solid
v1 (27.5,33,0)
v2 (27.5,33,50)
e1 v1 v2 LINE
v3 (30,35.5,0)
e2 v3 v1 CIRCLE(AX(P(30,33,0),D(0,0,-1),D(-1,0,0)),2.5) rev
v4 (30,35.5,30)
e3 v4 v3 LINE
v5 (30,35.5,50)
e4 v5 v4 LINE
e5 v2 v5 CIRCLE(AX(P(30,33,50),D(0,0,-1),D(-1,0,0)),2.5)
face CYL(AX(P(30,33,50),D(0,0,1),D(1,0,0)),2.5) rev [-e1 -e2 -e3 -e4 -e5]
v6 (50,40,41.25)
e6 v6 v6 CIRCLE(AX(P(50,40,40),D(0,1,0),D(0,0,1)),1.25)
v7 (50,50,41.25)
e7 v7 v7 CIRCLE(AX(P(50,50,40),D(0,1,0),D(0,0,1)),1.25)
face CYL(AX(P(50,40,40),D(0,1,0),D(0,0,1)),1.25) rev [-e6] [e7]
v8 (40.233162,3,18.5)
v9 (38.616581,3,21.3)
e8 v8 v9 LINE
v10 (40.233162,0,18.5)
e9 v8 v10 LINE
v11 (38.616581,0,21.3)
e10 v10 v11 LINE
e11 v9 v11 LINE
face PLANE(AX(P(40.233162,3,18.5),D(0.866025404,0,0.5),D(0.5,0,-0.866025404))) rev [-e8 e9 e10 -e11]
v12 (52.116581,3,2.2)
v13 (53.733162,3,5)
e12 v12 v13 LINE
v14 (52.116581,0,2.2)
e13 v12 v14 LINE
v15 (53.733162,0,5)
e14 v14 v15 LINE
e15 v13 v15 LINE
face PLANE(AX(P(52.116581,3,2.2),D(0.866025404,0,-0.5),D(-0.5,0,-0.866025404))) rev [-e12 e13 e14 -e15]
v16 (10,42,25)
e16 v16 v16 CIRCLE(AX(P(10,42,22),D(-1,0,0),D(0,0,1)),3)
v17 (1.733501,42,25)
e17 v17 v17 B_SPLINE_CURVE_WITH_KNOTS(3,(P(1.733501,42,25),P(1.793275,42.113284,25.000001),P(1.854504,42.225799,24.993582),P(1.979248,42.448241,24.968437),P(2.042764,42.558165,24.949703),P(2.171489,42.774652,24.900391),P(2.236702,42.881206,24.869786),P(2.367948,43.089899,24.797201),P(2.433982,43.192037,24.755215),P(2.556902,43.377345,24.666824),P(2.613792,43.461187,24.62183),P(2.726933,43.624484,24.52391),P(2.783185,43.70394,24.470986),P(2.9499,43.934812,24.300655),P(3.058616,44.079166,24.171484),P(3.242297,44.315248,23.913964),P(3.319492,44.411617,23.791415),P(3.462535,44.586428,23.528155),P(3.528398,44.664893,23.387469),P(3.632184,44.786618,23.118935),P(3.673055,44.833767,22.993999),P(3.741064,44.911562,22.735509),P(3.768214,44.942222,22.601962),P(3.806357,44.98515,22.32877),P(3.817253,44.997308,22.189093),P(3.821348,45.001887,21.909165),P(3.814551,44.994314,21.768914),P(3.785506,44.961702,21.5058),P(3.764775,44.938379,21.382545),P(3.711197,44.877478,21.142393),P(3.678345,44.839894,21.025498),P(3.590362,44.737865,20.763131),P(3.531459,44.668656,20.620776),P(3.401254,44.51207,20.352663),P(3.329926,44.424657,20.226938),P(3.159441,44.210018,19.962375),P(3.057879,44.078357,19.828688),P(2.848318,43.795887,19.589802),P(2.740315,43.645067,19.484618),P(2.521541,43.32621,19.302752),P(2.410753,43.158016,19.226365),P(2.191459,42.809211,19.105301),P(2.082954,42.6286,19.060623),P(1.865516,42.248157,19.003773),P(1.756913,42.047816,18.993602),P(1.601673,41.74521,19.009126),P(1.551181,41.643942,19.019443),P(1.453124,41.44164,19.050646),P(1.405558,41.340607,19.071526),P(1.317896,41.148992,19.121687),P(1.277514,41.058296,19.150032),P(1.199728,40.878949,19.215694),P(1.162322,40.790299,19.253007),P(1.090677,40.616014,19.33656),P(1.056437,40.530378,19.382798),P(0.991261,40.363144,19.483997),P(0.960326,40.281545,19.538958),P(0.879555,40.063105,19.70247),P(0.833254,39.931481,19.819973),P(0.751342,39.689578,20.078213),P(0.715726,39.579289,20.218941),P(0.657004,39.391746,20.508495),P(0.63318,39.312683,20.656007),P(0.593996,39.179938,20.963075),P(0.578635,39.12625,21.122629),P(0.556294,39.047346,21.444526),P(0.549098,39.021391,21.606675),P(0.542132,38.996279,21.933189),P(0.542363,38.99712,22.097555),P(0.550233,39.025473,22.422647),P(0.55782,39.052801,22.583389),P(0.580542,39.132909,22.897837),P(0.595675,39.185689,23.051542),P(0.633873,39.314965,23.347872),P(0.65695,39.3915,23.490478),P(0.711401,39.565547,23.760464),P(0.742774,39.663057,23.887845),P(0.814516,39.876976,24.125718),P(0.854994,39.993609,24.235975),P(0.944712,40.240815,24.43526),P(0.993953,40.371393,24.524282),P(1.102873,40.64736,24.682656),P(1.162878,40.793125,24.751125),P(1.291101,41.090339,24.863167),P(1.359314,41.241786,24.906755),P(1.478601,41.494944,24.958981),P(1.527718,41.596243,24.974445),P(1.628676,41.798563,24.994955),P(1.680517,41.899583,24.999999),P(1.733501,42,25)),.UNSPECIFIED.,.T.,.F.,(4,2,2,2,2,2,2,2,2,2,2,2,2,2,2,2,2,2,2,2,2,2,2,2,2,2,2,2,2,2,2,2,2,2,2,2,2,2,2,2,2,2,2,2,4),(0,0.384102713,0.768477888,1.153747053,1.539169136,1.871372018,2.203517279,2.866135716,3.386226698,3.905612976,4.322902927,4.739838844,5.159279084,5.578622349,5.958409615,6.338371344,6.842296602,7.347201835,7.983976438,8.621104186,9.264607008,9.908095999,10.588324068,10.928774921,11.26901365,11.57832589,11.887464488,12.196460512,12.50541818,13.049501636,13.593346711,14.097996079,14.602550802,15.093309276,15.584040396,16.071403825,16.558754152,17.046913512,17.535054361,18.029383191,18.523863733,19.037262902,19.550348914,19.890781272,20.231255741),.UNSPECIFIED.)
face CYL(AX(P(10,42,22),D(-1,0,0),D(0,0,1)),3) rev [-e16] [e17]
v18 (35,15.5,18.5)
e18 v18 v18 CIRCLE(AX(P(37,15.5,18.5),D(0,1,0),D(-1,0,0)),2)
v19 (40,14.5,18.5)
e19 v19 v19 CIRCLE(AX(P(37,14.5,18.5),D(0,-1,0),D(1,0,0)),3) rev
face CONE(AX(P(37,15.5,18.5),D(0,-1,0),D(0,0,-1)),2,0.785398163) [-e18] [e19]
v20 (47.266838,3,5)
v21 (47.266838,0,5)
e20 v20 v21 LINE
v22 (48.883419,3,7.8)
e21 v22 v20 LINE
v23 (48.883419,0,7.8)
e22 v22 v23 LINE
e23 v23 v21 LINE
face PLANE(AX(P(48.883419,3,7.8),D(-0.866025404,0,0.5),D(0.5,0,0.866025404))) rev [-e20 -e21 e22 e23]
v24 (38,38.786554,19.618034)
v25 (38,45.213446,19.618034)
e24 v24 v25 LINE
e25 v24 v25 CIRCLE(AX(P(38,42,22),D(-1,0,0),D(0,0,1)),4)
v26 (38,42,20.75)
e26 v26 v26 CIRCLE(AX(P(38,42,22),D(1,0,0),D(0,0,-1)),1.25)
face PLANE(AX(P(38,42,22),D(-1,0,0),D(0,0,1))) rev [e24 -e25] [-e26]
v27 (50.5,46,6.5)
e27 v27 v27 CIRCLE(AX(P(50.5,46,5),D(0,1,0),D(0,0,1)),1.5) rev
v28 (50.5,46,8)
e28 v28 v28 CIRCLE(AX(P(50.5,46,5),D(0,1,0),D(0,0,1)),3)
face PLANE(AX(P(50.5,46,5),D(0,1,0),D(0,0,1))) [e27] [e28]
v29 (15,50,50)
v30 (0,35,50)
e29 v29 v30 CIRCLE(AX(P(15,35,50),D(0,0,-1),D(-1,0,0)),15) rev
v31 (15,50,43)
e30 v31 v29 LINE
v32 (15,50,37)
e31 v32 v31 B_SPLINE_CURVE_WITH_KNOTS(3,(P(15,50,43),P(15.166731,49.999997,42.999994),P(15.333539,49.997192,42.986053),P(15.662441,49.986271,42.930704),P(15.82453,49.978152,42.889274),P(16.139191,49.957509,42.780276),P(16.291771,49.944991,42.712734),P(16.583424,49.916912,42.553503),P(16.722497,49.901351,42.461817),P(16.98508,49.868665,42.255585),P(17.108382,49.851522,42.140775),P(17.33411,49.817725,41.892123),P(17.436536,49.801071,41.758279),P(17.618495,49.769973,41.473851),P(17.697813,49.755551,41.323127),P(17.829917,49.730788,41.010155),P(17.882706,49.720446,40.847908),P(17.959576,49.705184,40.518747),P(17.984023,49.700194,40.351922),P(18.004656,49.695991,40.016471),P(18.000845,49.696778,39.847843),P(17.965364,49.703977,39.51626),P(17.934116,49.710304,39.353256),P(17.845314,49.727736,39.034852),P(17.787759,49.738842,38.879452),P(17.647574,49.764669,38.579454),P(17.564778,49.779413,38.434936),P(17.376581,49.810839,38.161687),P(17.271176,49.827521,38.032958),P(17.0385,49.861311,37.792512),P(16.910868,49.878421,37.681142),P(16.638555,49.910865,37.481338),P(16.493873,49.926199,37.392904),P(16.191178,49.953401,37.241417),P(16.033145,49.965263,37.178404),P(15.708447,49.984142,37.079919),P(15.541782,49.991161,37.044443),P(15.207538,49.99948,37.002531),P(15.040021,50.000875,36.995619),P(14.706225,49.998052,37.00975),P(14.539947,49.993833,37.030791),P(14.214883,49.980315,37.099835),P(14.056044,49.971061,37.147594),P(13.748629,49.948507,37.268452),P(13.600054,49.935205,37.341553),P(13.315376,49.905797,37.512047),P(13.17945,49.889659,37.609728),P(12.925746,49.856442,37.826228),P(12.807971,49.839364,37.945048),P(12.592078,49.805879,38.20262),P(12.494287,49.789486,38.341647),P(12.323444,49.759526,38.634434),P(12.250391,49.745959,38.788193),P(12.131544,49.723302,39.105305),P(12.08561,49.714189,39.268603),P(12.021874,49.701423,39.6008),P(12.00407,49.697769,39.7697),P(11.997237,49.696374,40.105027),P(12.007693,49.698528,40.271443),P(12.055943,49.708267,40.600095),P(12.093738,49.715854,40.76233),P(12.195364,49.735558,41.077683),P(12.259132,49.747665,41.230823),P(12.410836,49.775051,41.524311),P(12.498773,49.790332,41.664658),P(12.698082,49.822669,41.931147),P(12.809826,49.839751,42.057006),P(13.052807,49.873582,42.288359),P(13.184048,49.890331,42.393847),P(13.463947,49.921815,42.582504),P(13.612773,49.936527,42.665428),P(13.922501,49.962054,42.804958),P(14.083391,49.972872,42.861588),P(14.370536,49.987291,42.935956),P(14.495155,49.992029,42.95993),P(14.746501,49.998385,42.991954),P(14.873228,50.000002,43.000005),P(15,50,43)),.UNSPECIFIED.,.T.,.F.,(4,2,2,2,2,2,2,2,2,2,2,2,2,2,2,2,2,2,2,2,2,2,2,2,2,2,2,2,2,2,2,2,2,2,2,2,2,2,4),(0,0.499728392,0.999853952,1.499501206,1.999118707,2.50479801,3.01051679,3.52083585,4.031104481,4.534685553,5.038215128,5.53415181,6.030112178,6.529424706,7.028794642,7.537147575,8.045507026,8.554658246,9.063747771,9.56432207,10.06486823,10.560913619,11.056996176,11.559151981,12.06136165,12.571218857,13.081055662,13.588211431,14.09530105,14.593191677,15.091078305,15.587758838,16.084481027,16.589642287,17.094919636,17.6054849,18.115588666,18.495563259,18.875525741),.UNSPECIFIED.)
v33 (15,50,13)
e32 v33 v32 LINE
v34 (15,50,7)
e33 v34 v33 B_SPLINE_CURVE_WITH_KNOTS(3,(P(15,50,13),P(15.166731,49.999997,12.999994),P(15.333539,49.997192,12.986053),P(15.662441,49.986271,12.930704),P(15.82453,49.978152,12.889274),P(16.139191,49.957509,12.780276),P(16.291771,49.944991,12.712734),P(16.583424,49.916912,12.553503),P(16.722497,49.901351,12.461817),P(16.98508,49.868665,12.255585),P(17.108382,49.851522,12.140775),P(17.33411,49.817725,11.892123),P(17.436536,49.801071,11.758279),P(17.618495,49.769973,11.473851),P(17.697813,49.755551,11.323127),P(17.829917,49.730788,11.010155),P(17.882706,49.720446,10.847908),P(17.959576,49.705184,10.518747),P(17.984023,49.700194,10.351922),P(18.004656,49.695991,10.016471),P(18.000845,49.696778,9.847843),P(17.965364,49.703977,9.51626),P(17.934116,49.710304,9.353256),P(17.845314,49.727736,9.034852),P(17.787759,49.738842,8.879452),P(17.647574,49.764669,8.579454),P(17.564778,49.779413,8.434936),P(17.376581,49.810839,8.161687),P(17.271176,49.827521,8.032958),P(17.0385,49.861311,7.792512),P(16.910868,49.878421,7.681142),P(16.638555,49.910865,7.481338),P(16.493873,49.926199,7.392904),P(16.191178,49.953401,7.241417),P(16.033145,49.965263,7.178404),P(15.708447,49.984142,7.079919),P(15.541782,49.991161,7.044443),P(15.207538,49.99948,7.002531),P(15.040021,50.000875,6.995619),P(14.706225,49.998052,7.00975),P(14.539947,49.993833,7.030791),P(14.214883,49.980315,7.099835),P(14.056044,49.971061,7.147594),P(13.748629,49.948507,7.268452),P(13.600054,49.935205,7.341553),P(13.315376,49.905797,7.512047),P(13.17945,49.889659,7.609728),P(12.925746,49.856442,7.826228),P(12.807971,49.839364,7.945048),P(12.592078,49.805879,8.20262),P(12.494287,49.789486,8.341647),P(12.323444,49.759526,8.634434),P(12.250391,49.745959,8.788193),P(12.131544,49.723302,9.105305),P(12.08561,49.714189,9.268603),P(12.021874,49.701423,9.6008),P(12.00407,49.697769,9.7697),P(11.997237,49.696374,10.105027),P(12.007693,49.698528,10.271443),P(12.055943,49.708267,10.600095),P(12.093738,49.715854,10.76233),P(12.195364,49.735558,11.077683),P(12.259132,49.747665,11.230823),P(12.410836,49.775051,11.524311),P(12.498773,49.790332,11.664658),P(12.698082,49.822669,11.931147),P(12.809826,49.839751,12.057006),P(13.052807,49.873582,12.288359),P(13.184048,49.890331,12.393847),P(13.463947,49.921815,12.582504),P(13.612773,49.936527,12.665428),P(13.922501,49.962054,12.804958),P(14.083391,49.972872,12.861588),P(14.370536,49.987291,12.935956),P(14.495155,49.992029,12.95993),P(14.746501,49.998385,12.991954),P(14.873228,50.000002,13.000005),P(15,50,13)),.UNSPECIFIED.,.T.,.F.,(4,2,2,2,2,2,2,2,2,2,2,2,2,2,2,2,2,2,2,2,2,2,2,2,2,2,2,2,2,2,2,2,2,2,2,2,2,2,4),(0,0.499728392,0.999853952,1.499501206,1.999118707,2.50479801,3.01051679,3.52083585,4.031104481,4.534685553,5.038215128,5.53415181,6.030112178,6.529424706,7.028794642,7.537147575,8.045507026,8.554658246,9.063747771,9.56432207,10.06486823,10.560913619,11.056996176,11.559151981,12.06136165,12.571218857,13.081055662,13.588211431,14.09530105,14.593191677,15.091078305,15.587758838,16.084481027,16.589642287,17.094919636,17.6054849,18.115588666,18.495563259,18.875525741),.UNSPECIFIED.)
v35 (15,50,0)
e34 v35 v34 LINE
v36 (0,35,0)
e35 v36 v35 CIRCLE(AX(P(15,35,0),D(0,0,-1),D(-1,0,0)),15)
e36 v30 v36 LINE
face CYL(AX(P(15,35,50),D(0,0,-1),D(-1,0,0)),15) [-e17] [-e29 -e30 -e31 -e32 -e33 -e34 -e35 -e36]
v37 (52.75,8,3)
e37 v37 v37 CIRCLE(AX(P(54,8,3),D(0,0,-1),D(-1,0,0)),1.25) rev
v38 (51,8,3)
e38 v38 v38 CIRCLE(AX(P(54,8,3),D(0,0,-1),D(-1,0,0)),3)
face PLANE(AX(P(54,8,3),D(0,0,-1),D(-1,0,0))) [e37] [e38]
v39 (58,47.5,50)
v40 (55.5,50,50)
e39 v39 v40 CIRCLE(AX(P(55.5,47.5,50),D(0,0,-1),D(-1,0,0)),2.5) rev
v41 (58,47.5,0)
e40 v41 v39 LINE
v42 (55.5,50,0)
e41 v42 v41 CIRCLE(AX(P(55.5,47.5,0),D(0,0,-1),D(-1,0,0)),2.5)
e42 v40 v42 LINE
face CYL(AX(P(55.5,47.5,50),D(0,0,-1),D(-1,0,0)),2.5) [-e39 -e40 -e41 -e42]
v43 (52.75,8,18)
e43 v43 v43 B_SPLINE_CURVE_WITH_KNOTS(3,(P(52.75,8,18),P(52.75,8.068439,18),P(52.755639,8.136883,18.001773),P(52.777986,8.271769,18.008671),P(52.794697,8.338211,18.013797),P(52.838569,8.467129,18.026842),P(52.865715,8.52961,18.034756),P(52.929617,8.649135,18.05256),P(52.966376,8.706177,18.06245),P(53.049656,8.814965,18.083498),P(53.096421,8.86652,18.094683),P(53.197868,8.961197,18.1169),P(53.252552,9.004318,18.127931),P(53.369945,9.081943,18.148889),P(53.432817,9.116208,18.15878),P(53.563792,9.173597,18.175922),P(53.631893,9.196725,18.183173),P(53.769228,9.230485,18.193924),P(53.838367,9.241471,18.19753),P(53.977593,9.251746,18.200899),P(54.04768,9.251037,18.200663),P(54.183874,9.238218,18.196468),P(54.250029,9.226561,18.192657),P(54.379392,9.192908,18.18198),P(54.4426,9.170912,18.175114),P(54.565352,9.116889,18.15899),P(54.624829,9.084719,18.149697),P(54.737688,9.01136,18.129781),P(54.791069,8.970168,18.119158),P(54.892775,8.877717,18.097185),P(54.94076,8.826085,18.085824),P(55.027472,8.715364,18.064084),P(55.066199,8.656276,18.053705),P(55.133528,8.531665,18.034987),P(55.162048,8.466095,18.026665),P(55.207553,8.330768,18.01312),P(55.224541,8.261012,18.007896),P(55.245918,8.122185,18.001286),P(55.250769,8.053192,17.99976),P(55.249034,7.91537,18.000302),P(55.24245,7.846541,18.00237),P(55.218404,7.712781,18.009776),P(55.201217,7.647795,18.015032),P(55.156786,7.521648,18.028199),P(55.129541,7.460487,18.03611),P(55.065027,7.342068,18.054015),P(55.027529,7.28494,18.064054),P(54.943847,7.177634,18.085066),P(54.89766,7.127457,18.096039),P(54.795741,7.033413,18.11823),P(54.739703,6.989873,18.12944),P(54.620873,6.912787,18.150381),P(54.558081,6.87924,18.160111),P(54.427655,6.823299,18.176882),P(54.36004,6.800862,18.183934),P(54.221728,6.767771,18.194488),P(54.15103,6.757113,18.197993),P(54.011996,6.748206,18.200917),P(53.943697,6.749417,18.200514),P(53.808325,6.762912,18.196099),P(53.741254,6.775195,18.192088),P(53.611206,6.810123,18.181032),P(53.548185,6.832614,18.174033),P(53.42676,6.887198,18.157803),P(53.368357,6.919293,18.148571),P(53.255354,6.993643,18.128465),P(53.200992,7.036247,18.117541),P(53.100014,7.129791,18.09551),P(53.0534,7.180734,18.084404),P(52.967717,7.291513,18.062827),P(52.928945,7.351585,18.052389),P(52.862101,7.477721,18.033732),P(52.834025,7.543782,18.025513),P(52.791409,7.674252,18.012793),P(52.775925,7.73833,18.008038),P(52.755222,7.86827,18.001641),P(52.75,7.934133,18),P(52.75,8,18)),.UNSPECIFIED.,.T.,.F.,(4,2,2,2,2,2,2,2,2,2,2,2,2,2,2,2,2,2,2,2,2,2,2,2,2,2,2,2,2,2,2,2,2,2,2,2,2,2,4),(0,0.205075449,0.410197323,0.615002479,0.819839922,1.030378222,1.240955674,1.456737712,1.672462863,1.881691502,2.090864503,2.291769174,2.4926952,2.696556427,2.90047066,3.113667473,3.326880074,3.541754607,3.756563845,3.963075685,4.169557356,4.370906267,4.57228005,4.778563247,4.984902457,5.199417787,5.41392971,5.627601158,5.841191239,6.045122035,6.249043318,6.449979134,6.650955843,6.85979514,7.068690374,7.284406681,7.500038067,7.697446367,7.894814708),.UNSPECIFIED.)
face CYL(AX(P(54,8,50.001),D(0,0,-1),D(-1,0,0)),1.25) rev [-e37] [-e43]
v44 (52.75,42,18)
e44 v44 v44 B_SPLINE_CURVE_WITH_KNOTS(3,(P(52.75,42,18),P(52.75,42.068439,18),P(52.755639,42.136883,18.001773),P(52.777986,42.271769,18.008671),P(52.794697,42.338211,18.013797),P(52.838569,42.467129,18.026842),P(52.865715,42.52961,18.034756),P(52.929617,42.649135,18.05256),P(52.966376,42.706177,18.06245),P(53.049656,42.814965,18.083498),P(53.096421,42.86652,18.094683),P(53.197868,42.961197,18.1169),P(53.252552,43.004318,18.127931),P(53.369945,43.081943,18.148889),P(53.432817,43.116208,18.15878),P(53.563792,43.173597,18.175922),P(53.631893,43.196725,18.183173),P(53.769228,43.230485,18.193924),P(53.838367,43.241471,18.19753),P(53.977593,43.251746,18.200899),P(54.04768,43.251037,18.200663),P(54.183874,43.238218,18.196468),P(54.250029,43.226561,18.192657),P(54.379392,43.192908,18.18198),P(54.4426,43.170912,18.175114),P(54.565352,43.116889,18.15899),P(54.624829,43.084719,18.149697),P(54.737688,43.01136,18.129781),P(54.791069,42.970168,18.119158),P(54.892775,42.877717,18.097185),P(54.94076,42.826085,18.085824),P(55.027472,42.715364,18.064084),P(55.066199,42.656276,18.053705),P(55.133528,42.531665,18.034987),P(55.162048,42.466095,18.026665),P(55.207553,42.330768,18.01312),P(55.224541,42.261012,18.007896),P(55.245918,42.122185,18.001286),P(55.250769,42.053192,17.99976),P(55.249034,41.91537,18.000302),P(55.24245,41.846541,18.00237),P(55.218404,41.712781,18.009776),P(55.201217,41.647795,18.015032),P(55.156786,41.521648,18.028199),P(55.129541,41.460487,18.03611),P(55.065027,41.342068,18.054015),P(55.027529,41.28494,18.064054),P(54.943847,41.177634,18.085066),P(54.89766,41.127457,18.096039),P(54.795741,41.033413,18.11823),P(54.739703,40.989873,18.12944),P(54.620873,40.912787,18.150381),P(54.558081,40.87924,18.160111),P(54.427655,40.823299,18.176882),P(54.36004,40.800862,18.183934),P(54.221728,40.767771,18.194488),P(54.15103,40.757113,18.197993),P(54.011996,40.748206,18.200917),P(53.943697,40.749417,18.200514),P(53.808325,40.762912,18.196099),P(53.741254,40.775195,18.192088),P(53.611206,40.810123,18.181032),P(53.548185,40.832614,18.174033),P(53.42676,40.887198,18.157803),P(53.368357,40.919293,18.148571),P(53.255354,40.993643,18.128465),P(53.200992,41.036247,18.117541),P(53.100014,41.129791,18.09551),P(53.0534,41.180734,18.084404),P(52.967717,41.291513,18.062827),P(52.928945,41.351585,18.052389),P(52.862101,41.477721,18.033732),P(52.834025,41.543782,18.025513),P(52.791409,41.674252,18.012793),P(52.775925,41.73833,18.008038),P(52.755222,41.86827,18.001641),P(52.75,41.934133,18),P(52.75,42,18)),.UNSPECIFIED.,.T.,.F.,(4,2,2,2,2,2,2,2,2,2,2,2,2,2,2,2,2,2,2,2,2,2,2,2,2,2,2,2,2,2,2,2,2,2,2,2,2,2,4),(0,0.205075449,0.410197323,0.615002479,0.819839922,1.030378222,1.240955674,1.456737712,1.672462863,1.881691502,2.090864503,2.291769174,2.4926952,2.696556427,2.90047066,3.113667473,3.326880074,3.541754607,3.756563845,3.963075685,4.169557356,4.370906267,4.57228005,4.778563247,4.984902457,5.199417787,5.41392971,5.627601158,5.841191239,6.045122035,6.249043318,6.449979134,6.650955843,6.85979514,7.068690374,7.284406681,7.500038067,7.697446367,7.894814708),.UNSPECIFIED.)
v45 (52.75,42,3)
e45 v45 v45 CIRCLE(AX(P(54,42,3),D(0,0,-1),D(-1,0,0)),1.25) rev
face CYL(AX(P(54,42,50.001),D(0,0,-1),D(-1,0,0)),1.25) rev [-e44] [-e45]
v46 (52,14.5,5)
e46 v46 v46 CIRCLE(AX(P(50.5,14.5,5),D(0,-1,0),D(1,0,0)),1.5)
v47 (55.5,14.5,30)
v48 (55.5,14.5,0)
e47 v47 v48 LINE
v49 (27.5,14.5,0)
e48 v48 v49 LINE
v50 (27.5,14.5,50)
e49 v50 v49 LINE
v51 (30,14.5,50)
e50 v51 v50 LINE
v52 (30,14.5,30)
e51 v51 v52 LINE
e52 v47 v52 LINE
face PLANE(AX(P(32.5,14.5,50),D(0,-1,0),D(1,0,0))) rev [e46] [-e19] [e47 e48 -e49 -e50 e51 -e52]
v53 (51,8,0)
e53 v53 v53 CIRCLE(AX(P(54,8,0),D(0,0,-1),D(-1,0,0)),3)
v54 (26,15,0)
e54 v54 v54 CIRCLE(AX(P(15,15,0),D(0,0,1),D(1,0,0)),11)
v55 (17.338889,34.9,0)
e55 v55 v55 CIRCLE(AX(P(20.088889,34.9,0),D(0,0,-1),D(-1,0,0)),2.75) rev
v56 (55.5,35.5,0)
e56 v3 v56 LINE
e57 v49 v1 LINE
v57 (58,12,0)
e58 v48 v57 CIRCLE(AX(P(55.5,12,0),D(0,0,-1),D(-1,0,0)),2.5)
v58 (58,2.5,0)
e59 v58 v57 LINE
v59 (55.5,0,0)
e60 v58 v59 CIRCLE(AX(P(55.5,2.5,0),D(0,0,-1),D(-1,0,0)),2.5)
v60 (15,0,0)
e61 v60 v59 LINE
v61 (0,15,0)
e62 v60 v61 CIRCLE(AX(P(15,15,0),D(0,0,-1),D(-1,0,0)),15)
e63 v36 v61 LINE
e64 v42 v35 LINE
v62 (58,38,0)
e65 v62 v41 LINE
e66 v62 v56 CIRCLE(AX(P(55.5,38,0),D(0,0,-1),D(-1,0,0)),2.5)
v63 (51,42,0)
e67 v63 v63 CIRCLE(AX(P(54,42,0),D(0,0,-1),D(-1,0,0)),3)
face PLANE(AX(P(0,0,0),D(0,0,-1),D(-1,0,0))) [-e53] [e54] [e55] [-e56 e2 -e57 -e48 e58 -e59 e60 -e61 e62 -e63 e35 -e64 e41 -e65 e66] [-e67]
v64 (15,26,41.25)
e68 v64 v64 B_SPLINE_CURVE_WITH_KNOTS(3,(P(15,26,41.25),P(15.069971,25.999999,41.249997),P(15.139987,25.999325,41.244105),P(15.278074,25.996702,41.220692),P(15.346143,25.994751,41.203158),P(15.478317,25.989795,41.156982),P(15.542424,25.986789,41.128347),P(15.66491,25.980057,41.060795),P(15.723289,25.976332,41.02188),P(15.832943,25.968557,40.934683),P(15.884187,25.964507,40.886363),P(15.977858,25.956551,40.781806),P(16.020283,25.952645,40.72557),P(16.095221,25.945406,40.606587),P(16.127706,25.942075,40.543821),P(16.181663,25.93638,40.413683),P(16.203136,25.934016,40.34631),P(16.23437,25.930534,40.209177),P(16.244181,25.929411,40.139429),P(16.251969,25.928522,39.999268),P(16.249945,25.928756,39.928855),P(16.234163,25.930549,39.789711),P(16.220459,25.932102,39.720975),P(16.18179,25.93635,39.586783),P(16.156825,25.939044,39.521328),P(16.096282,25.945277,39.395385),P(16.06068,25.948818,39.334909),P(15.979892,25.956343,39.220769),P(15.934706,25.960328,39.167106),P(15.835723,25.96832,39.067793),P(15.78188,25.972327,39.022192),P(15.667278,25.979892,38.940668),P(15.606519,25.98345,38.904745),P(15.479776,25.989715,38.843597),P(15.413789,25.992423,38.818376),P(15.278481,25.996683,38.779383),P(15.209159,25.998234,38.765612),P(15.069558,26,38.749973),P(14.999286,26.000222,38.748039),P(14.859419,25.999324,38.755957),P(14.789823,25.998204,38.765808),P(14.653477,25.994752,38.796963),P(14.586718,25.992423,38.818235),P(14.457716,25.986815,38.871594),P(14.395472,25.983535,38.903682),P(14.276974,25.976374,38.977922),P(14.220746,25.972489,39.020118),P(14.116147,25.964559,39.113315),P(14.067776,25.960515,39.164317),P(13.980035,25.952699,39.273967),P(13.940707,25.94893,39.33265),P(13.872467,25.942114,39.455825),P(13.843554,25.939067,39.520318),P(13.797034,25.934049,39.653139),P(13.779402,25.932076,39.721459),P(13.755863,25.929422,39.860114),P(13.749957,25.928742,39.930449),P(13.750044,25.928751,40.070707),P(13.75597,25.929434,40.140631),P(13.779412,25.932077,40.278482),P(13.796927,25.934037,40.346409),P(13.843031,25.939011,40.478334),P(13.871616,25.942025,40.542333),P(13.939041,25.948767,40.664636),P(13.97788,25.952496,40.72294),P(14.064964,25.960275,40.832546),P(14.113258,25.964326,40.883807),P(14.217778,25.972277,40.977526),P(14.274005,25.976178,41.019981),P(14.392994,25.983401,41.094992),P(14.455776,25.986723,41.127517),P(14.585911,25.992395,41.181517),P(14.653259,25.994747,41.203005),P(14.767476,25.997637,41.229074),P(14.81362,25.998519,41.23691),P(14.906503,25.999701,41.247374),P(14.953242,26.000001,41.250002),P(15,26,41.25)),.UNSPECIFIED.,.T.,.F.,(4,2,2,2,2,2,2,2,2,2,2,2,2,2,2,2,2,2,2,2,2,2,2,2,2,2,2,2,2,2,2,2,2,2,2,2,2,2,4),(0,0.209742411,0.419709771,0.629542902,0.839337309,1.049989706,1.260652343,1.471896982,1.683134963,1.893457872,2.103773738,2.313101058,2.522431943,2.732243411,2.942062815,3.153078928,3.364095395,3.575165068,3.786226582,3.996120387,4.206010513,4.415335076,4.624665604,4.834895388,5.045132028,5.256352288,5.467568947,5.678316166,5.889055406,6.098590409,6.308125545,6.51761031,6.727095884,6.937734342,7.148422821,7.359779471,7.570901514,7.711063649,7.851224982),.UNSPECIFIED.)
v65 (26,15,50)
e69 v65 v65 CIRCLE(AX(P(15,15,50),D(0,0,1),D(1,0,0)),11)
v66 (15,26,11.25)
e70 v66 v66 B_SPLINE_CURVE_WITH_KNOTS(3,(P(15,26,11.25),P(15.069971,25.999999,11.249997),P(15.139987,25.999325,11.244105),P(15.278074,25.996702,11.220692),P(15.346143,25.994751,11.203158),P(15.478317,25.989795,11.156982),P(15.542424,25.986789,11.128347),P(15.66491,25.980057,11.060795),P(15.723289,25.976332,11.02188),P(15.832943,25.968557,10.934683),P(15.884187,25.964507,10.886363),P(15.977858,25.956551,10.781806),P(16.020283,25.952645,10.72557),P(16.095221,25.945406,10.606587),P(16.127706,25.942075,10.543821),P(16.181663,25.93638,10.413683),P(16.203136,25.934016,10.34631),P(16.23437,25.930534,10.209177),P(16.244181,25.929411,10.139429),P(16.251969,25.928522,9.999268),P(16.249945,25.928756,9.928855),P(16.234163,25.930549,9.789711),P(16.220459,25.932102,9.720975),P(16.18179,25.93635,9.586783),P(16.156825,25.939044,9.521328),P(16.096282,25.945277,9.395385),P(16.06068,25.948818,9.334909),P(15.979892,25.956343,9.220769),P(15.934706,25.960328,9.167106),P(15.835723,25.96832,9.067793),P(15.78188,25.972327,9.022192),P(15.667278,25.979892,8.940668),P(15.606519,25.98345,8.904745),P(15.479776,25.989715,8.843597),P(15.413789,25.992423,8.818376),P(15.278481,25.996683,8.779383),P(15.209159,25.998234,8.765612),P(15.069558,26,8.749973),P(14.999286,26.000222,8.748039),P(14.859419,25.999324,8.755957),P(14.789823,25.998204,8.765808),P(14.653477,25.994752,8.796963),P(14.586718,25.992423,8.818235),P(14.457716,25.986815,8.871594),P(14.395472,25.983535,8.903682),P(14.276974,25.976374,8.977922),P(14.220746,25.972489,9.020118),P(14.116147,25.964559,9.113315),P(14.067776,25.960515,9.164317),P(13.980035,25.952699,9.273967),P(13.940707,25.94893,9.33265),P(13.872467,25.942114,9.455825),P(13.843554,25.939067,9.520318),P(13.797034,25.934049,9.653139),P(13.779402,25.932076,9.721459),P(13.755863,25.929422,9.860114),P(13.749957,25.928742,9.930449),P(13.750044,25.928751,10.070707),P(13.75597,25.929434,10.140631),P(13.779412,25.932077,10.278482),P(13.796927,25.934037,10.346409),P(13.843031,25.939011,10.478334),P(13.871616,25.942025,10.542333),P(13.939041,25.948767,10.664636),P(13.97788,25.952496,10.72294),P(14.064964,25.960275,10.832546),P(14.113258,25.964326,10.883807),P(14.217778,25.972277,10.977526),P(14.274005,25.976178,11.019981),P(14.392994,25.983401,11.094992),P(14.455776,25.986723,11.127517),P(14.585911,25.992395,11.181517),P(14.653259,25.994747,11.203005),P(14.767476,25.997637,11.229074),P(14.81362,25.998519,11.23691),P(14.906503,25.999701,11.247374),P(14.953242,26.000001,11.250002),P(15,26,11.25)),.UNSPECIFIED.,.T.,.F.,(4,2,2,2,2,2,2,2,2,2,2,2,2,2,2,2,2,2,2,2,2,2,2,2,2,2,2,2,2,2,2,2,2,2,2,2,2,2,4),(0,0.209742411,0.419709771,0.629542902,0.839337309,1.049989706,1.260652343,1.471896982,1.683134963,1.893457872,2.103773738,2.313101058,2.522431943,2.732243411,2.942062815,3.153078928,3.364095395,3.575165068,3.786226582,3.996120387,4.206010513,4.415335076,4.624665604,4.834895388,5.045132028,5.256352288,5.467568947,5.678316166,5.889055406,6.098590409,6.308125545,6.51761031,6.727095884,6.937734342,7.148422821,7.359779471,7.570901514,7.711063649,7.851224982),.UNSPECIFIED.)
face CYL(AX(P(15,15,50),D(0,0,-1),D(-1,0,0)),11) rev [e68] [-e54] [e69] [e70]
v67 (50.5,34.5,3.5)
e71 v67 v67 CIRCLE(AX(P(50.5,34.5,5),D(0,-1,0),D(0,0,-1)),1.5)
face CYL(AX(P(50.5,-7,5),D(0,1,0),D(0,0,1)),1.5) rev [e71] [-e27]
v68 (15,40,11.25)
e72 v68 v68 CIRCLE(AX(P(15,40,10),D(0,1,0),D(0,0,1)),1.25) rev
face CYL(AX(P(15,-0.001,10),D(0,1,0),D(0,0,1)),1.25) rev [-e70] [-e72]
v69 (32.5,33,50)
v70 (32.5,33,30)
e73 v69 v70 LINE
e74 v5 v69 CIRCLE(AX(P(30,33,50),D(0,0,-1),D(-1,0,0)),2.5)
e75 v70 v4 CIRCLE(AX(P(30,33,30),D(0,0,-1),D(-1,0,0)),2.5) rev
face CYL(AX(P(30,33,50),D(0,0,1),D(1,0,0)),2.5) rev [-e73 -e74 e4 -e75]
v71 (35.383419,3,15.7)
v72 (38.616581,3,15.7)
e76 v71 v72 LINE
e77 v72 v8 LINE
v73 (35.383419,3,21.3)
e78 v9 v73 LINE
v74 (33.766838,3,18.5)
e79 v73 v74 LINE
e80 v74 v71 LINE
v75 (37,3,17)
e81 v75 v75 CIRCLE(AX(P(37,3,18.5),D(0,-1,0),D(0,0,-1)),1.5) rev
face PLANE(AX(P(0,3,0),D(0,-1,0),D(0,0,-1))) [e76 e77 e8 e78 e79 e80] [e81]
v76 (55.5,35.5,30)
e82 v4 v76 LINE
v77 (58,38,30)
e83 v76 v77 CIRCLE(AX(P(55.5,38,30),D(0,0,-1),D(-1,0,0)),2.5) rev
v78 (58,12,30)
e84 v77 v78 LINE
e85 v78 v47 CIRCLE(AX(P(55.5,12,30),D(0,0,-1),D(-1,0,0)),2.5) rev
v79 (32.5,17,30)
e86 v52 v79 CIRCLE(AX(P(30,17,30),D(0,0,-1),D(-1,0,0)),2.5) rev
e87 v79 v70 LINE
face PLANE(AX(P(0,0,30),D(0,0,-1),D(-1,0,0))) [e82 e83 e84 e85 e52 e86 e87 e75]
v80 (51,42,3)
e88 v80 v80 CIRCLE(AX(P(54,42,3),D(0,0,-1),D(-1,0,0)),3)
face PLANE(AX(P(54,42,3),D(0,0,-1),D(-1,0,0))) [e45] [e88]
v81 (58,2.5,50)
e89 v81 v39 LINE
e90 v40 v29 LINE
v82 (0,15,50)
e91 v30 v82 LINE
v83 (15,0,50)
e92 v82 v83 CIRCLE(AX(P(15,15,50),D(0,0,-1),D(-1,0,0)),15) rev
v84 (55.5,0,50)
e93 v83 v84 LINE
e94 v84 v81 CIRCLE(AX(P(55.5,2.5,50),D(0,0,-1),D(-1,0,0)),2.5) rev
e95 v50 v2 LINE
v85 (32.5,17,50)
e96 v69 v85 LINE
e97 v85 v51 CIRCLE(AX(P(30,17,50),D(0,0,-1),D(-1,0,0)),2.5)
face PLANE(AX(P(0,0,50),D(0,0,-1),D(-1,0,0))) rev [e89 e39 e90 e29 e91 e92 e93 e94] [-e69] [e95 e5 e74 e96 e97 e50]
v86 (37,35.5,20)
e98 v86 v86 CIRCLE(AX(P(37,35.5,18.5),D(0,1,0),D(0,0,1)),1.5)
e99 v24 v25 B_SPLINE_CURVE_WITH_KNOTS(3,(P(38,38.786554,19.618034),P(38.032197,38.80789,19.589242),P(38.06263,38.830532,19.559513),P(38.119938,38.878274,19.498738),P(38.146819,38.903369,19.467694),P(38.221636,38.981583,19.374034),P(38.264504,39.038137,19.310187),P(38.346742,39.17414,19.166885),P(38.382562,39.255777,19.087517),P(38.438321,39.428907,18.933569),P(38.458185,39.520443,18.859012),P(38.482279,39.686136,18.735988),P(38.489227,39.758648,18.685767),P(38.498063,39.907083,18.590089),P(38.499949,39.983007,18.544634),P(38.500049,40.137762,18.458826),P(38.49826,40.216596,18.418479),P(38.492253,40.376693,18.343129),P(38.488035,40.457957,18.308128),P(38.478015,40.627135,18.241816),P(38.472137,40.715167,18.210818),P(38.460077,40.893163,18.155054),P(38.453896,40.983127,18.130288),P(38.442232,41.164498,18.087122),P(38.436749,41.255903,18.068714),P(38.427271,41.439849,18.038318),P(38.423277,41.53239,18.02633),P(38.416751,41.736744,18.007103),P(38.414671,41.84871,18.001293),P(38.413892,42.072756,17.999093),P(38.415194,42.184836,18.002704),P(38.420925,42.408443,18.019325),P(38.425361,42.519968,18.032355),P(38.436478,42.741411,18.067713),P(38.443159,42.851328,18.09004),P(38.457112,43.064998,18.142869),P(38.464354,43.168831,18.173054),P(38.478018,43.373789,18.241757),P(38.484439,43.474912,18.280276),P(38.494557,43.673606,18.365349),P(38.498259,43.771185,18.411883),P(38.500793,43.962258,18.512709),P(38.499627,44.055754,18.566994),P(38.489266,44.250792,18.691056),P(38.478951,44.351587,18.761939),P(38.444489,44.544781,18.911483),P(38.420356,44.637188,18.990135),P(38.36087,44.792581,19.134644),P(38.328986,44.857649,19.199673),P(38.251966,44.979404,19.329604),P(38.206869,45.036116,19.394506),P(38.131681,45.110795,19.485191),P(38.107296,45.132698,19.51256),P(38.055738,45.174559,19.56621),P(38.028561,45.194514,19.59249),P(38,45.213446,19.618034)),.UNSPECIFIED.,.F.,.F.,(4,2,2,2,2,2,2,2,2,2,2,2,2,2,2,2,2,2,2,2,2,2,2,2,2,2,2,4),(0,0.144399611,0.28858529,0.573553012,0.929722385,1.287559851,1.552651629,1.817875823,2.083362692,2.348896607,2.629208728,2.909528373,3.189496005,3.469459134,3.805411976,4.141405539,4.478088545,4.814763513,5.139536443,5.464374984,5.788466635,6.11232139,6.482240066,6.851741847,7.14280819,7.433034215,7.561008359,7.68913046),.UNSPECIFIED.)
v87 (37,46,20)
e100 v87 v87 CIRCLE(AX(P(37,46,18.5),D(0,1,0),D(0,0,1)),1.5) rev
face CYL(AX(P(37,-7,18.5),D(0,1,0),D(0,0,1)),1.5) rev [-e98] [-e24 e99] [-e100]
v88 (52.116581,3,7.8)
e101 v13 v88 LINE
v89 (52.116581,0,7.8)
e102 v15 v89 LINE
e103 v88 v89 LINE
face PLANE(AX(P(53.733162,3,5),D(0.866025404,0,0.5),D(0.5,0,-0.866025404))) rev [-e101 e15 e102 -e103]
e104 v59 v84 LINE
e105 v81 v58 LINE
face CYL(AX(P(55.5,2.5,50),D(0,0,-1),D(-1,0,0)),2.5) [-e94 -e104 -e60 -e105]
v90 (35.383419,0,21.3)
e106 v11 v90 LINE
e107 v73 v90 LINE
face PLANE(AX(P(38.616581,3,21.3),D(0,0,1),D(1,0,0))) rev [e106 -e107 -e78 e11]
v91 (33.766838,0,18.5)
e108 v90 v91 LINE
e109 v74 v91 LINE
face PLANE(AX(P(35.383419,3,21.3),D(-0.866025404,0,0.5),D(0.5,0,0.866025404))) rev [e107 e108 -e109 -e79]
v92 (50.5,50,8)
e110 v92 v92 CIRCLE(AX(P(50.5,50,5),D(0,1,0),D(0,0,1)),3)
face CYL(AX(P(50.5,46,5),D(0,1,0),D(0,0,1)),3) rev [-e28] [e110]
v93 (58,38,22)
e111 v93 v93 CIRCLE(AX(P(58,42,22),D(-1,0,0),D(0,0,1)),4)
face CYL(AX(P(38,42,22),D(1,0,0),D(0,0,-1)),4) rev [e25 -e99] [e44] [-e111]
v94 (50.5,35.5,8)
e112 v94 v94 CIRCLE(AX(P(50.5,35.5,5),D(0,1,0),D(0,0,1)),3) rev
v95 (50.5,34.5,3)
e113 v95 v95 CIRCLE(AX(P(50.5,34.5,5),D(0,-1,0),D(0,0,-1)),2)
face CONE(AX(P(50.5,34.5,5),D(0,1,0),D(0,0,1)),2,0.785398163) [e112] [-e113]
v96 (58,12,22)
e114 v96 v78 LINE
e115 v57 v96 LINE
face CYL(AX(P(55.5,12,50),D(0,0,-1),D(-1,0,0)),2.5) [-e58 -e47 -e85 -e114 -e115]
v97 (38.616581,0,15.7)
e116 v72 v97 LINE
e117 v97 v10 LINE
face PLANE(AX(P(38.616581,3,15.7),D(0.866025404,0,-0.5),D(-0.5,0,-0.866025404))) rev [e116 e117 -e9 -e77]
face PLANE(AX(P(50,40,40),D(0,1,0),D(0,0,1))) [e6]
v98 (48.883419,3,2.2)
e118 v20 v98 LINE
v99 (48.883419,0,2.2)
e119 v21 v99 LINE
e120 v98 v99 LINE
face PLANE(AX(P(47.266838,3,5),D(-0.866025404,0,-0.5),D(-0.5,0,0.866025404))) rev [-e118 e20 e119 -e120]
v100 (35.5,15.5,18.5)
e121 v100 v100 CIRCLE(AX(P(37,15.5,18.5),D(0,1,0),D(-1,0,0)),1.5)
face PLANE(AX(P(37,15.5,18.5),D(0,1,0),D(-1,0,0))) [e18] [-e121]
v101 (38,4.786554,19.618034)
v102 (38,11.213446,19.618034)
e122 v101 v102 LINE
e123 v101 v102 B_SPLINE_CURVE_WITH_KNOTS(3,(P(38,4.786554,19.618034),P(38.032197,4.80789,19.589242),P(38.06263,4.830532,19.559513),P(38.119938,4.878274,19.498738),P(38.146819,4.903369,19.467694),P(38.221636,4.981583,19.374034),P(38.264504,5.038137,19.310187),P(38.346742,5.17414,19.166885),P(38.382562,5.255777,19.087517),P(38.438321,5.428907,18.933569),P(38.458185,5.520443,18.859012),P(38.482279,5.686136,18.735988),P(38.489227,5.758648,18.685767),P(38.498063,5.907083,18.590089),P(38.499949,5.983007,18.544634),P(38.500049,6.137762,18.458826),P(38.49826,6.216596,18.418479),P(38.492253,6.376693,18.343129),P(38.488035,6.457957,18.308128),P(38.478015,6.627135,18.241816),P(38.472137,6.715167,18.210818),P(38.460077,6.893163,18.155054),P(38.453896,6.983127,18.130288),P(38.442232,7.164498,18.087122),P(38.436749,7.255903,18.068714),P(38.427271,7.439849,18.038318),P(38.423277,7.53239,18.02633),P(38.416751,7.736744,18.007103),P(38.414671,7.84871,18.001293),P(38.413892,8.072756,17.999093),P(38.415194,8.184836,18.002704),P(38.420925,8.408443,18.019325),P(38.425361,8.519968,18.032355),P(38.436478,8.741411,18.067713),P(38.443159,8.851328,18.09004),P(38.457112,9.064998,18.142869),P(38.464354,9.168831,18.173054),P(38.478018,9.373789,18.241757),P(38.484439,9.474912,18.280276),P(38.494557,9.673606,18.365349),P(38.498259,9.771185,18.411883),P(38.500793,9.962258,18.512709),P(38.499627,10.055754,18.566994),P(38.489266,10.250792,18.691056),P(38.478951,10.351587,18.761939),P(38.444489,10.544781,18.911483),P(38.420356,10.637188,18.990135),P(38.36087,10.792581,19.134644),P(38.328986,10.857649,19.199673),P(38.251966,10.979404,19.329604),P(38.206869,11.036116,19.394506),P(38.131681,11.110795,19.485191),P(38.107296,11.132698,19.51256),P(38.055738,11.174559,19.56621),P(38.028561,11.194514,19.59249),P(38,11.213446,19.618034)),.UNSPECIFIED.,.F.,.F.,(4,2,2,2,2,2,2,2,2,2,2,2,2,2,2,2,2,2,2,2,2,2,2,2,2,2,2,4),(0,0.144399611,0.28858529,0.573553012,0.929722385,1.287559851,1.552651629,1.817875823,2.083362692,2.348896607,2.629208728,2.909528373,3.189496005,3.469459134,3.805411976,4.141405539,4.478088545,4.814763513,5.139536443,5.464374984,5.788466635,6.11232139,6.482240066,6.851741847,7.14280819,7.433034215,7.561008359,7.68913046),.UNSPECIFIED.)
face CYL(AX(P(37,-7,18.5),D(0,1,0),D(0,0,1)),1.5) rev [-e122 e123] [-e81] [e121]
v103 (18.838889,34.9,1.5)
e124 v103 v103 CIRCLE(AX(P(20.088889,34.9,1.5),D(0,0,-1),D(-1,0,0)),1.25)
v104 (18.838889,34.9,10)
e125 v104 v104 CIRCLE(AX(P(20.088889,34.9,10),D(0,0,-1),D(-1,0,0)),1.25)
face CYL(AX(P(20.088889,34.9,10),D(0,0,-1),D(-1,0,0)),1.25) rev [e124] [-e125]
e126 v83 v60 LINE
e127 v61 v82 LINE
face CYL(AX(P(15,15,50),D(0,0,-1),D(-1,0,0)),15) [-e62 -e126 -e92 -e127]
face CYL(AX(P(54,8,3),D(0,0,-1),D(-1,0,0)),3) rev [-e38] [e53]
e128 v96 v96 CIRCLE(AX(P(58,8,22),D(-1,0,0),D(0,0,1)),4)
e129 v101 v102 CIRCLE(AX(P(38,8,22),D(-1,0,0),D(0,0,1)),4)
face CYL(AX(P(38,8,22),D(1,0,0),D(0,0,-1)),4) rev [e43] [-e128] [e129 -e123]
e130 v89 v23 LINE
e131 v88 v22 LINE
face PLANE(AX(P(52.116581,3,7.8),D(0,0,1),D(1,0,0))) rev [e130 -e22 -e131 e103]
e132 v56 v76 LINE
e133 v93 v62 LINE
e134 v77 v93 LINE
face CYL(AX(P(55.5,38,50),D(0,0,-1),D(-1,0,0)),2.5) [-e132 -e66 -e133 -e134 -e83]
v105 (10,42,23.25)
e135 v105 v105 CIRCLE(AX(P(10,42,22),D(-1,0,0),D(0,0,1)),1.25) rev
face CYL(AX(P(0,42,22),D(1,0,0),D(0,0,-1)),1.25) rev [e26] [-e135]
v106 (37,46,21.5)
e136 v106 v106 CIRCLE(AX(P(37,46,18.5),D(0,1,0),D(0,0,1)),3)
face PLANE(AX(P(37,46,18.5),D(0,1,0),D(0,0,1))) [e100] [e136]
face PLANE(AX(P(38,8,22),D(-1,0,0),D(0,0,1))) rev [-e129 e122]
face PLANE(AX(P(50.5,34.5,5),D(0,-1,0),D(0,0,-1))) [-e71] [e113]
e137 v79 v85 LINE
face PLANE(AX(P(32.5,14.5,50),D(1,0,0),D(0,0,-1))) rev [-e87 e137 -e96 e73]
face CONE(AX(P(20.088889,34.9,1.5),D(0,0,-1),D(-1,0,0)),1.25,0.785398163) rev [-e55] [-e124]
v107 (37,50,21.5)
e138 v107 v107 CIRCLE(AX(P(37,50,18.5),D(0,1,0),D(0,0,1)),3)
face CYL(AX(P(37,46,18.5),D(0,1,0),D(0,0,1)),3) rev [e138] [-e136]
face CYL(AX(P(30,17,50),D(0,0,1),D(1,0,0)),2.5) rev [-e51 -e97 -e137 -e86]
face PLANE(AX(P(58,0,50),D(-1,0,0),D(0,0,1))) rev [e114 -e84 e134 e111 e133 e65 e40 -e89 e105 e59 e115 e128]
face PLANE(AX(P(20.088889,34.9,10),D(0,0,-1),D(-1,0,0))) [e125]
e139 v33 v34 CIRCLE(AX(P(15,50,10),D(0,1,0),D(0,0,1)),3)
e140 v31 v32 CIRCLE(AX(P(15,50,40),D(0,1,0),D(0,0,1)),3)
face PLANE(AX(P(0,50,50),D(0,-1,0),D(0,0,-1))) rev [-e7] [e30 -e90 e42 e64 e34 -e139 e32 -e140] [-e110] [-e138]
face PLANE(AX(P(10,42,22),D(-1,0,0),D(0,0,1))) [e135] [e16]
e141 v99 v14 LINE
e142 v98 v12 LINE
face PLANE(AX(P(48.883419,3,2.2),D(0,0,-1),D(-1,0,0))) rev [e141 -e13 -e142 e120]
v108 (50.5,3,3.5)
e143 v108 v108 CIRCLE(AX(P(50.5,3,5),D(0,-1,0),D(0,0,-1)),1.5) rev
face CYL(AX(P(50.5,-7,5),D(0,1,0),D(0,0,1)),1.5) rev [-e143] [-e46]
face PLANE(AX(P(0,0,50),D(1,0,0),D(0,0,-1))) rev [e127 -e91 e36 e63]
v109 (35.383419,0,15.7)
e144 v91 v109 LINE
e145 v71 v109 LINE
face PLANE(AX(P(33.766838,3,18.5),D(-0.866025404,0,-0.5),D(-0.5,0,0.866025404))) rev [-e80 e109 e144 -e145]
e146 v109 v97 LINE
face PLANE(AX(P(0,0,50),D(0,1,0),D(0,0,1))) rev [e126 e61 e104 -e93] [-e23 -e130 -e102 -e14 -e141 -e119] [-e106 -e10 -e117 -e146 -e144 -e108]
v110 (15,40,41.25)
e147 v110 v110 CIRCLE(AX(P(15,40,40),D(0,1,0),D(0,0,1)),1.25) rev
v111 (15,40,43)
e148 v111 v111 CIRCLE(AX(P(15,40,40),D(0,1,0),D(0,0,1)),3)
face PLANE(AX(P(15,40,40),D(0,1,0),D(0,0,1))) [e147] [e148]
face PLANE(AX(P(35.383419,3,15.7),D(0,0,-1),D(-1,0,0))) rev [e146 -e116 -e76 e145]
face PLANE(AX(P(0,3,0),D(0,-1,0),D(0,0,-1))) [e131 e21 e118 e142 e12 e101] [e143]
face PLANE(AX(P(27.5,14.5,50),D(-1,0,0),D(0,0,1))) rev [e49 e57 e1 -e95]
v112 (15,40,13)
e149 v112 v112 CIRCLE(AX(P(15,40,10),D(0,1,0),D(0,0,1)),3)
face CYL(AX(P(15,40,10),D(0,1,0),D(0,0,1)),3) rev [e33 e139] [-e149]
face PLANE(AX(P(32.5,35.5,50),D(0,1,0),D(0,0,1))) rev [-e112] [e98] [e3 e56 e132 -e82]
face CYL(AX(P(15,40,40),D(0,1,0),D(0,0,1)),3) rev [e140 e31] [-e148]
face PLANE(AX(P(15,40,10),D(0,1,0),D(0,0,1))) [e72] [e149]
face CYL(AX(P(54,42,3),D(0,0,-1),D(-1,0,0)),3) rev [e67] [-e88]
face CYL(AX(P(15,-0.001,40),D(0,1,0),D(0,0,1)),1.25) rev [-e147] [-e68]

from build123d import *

# Parameters (mm, degrees)
SKETCH1_W                = 58
SKETCH1_H                = 50
SKETCH1_R                = 11
BOSS_EXTRUDE1_DEPTH      = 50
SKETCH2_R                = 4
CUT_EXTRUDE1_DEPTH       = 20
SKETCH3_W                = 5
SKETCH3_H                = 21
CUT_EXTRUDE2_DEPTH       = 92.454906921
SKETCH14_W               = 25.5
SKETCH14_H               = 21
CUT_EXTRUDE9_DEPTH       = 30
SKETCH16_R               = 1.5
CUT_EXTRUDE10_DEPTH      = 57
CUT_EXTRUDE11_DEPTH      = 3
FILLET3_R                = 15
CUT_EXTRUDE12_REACH      = 93.455
SKETCH18_R               = 1.25
CUT_EXTRUDE13_REACH      = 93.455
CUT_EXTRUDE13_END_RADIUS = 11
SKETCH19_R               = 1.25
SKETCH20_R               = 3
CUT_EXTRUDE14_DEPTH      = 10
SKETCH21_R               = 3
CUT_EXTRUDE15_DEPTH      = 3
FILLET4_R                = 2.5
SKETCH22_R               = 1.25
CUT_EXTRUDE16_DEPTH      = 81.274529133
SKETCH23_R               = 3
CUT_EXTRUDE17_DEPTH      = 10
SKETCH24_R               = 3
CUT_EXTRUDE18_DEPTH      = 4
SKETCH25_R               = 1.25
CUT_EXTRUDE19_DEPTH      = 10
SKETCH26_R               = 3
SKETCH26_R_2             = 1.5
BOSS_EXTRUDE2_DEPTH      = 1
BOSS_EXTRUDE3_START      = 1
SKETCH27_R               = 3
SKETCH27_R_2             = 1.5
BOSS_EXTRUDE3_DEPTH      = 1
CHAMFER1_SIZE            = 1
SKETCH28_R               = 1.25
CUT_EXTRUDE20_DEPTH      = 10
CHAMFER2_SIZE            = 1.5


with BuildPart() as part:
    # Sketch1 → Boss-Extrude1 (new body)
    with BuildSketch(Plane.XY):
        with Locations((29, 25)):
            Rectangle(SKETCH1_W, SKETCH1_H)
        with Locations((15, 15)):
            Circle(SKETCH1_R, mode=Mode.SUBTRACT)
    extrude(amount=BOSS_EXTRUDE1_DEPTH)

    # Sketch2 → Cut-Extrude1 (cut)
    with BuildSketch(Plane.ZY.offset(-58)):
        with Locations((22, 42)):
            Circle(SKETCH2_R)
        with Locations((22, 8)):
            Circle(SKETCH2_R)
    extrude(amount=CUT_EXTRUDE1_DEPTH, mode=Mode.SUBTRACT)

    # Sketch3 → Cut-Extrude2 (cut, through all)
    with BuildSketch(Plane(origin=(0, 0, 0), x_dir=(-1, 0, 0), z_dir=(0, 0, -1))):
        with Locations((-30, 25)):
            Rectangle(SKETCH3_W, SKETCH3_H)
    extrude(amount=-CUT_EXTRUDE2_DEPTH, mode=Mode.SUBTRACT)

    # Sketch14 → Cut-Extrude9 (cut)
    with BuildSketch(Plane(origin=(0, 0, 0), x_dir=(-1, 0, 0), z_dir=(0, 0, -1))):
        with Locations((-45.25, 25)):
            Rectangle(SKETCH14_W, SKETCH14_H)
    extrude(amount=-CUT_EXTRUDE9_DEPTH, mode=Mode.SUBTRACT)

    # Sketch16 → Cut-Extrude10 (cut)
    with BuildSketch(Plane(origin=(0, 50, 0), x_dir=(1, 0, 0), z_dir=(0, 1, 0))):
        with Locations(Location((50.5, -5, 0), (0, 0, 270))):
            Circle(SKETCH16_R)
        with Locations(Location((37, -18.5, 0), (0, 0, 270))):
            Circle(SKETCH16_R)
    extrude(amount=-CUT_EXTRUDE10_DEPTH, mode=Mode.SUBTRACT)

    # Sketch17 → Cut-Extrude11 (cut)
    with BuildSketch(Plane.XZ):
        Polygon((38.616580754, 15.7), (40.233161507, 18.5), (38.616580754, 21.3), (35.383419246, 21.3), (33.766838493, 18.5), (35.383419246, 15.7), align=None)
        Polygon((53.733161507, 5), (52.116580754, 7.8), (48.883419246, 7.8), (47.266838493, 5), (48.883419246, 2.2), (52.116580754, 2.2), align=None)
    extrude(amount=-CUT_EXTRUDE11_DEPTH, mode=Mode.SUBTRACT)

    # Fillet3
    fillet3_edges = [part.edges().sort_by_distance(p)[0] for p in [
        (0, 50, 25),
        (0, 0, 25),
    ]]
    fillet(fillet3_edges, radius=FILLET3_R)

    # Sketch18 → Cut-Extrude12 (cut, up to next)
    with BuildSketch(Plane(origin=(0, 0, 0), x_dir=(-1, 0, 0), z_dir=(0, 0, -1)), mode=Mode.PRIVATE) as cut_extrude12_sk1:
        with Locations((-54, 42)):
            Circle(SKETCH18_R)
    cut_extrude12_tool1 = extrude(cut_extrude12_sk1.sketch, amount=-CUT_EXTRUDE12_REACH, mode=Mode.PRIVATE) & part.part
    # Sketch18 → Cut-Extrude12 (cut, up to next)
    with BuildSketch(Plane(origin=(0, 0, 0), x_dir=(-1, 0, 0), z_dir=(0, 0, -1)), mode=Mode.PRIVATE) as cut_extrude12_sk2:
        with Locations((-54, 8)):
            Circle(SKETCH18_R)
    cut_extrude12_tool2 = extrude(cut_extrude12_sk2.sketch, amount=-CUT_EXTRUDE12_REACH, mode=Mode.PRIVATE) & part.part
    add(cut_extrude12_tool1.solids().sort_by_distance((54, 42, 0))[0], mode=Mode.SUBTRACT)
    add(cut_extrude12_tool2.solids().sort_by_distance((54, 8, 0))[0], mode=Mode.SUBTRACT)

    # Cut-Extrude13: up to this cylinder (the profile starts outside it)
    cut_extrude13_end = Plane(origin=(15, 15, 25), z_dir=(0, 0, -1)) * Cylinder(CUT_EXTRUDE13_END_RADIUS, 239.91, mode=Mode.PRIVATE)
    # Sketch19 → Cut-Extrude13 (cut, up to the surface)
    with BuildSketch(Plane(origin=(0, 50, 0), x_dir=(1, 0, 0), z_dir=(0, 1, 0)), mode=Mode.PRIVATE) as cut_extrude13_sk1:
        with Locations(Location((15, -10, 0), (0, 0, 270))):
            Circle(SKETCH19_R)
    cut_extrude13_tool1 = extrude(cut_extrude13_sk1.sketch, amount=-CUT_EXTRUDE13_REACH, mode=Mode.PRIVATE) - cut_extrude13_end
    add(cut_extrude13_tool1.solids().sort_by_distance((15, 50, 10))[0], mode=Mode.SUBTRACT)
    # Sketch19 → Cut-Extrude13 (cut, up to the surface)
    with BuildSketch(Plane(origin=(0, 50, 0), x_dir=(1, 0, 0), z_dir=(0, 1, 0)), mode=Mode.PRIVATE) as cut_extrude13_sk2:
        with Locations(Location((15, -40, 0), (0, 0, 270))):
            Circle(SKETCH19_R)
    cut_extrude13_tool2 = extrude(cut_extrude13_sk2.sketch, amount=-CUT_EXTRUDE13_REACH, mode=Mode.PRIVATE) - cut_extrude13_end
    add(cut_extrude13_tool2.solids().sort_by_distance((15, 50, 40))[0], mode=Mode.SUBTRACT)

    # Sketch20 → Cut-Extrude14 (cut)
    with BuildSketch(Plane(origin=(0, 50, 0), x_dir=(1, 0, 0), z_dir=(0, 1, 0))):
        with Locations(Location((15, -10, 0), (0, 0, 270))):
            Circle(SKETCH20_R)
        with Locations(Location((15, -40, 0), (0, 0, 270))):
            Circle(SKETCH20_R)
    extrude(amount=-CUT_EXTRUDE14_DEPTH, mode=Mode.SUBTRACT)

    # Sketch21 → Cut-Extrude15 (cut)
    with BuildSketch(Plane(origin=(0, 0, 0), x_dir=(-1, 0, 0), z_dir=(0, 0, -1))):
        with Locations((-54, 42)):
            Circle(SKETCH21_R)
        with Locations((-54, 8)):
            Circle(SKETCH21_R)
    extrude(amount=-CUT_EXTRUDE15_DEPTH, mode=Mode.SUBTRACT)

    # Fillet4
    fillet4_edges = [part.edges().sort_by_distance(p)[0] for p in [
        (32.5, 35.5, 40),
        (32.5, 14.5, 40),
        (58, 0, 25),
        (58, 14.5, 15),
        (27.5, 35.5, 25),
        (58, 35.5, 15),
        (58, 50, 25),
    ]]
    fillet(fillet4_edges, radius=FILLET4_R - 0.0001)  # a hair under: the kernel refuses the full size

    # Sketch22 → Cut-Extrude16 (cut, through all)
    with BuildSketch(Plane(origin=(38, 0, 0), x_dir=(0, 0, -1), z_dir=(1, 0, 0))):
        with Locations((-22, 42)):
            Circle(SKETCH22_R)
    extrude(amount=-CUT_EXTRUDE16_DEPTH, mode=Mode.SUBTRACT)

    # Sketch23 → Cut-Extrude17 (cut)
    with BuildSketch(Plane.ZY):
        with Locations((22, 42)):
            Circle(SKETCH23_R)
    extrude(amount=-CUT_EXTRUDE17_DEPTH, mode=Mode.SUBTRACT)

    # Sketch24 → Cut-Extrude18 (cut)
    with BuildSketch(Plane(origin=(0, 50, 0), x_dir=(1, 0, 0), z_dir=(0, 1, 0))):
        with Locations(Location((50.5, -5, 0), (0, 0, 270))):
            Circle(SKETCH24_R)
        with Locations(Location((37, -18.5, 0), (0, 0, 270))):
            Circle(SKETCH24_R)
    extrude(amount=-CUT_EXTRUDE18_DEPTH, mode=Mode.SUBTRACT)

    # Sketch25 → Cut-Extrude19 (cut)
    with BuildSketch(Plane(origin=(0, 50, 0), x_dir=(1, 0, 0), z_dir=(0, 1, 0))):
        with Locations(Location((50, -40, 0), (0, 0, 270))):
            Circle(SKETCH25_R)
    extrude(amount=-CUT_EXTRUDE19_DEPTH, mode=Mode.SUBTRACT)

    # Sketch26 → Boss-Extrude2 (add)
    with BuildSketch(Plane.XZ.offset(-35.5)):
        with Locations(Location((50.5, 5, 0), (0, 0, 90))):
            Circle(SKETCH26_R)
        with Locations(Location((50.5, 5, 0), (0, 0, 90))):
            Circle(SKETCH26_R_2, mode=Mode.SUBTRACT)
    extrude(amount=BOSS_EXTRUDE2_DEPTH)

    # Sketch27 → Boss-Extrude3 (add)
    with BuildSketch(Plane(origin=(0, 14.5, 0), x_dir=(1, 0, 0), z_dir=(0, 1, 0)).offset(BOSS_EXTRUDE3_START)):
        with Locations(Location((37, -18.5, 0), (0, 0, 270))):
            Circle(SKETCH27_R)
        with Locations(Location((37, -18.5, 0), (0, 0, 270))):
            Circle(SKETCH27_R_2, mode=Mode.SUBTRACT)
    extrude(amount=-BOSS_EXTRUDE3_DEPTH)

    # Chamfer1
    chamfer1_edges = [part.edges().sort_by_distance(p)[0] for p in [
        (50.5, 34.5, 2),
        (37, 15.5, 15.5),
    ]]
    chamfer(chamfer1_edges, length=CHAMFER1_SIZE - 0.0001)  # a hair under: the kernel refuses the full size

    # Sketch28 → Cut-Extrude20 (cut)
    with BuildSketch(Plane(origin=(0, 0, 0), x_dir=(-1, 0, 0), z_dir=(0, 0, -1))):
        with Locations((-20.088889062, 34.9)):
            Circle(SKETCH28_R)
    extrude(amount=-CUT_EXTRUDE20_DEPTH, mode=Mode.SUBTRACT)

    # Chamfer2
    chamfer2_edges = [part.edges().sort_by_distance(p)[0] for p in [
        (21.338889062, 34.9, 0),
    ]]
    chamfer(chamfer2_edges, length=CHAMFER2_SIZE)


solid = part.part
